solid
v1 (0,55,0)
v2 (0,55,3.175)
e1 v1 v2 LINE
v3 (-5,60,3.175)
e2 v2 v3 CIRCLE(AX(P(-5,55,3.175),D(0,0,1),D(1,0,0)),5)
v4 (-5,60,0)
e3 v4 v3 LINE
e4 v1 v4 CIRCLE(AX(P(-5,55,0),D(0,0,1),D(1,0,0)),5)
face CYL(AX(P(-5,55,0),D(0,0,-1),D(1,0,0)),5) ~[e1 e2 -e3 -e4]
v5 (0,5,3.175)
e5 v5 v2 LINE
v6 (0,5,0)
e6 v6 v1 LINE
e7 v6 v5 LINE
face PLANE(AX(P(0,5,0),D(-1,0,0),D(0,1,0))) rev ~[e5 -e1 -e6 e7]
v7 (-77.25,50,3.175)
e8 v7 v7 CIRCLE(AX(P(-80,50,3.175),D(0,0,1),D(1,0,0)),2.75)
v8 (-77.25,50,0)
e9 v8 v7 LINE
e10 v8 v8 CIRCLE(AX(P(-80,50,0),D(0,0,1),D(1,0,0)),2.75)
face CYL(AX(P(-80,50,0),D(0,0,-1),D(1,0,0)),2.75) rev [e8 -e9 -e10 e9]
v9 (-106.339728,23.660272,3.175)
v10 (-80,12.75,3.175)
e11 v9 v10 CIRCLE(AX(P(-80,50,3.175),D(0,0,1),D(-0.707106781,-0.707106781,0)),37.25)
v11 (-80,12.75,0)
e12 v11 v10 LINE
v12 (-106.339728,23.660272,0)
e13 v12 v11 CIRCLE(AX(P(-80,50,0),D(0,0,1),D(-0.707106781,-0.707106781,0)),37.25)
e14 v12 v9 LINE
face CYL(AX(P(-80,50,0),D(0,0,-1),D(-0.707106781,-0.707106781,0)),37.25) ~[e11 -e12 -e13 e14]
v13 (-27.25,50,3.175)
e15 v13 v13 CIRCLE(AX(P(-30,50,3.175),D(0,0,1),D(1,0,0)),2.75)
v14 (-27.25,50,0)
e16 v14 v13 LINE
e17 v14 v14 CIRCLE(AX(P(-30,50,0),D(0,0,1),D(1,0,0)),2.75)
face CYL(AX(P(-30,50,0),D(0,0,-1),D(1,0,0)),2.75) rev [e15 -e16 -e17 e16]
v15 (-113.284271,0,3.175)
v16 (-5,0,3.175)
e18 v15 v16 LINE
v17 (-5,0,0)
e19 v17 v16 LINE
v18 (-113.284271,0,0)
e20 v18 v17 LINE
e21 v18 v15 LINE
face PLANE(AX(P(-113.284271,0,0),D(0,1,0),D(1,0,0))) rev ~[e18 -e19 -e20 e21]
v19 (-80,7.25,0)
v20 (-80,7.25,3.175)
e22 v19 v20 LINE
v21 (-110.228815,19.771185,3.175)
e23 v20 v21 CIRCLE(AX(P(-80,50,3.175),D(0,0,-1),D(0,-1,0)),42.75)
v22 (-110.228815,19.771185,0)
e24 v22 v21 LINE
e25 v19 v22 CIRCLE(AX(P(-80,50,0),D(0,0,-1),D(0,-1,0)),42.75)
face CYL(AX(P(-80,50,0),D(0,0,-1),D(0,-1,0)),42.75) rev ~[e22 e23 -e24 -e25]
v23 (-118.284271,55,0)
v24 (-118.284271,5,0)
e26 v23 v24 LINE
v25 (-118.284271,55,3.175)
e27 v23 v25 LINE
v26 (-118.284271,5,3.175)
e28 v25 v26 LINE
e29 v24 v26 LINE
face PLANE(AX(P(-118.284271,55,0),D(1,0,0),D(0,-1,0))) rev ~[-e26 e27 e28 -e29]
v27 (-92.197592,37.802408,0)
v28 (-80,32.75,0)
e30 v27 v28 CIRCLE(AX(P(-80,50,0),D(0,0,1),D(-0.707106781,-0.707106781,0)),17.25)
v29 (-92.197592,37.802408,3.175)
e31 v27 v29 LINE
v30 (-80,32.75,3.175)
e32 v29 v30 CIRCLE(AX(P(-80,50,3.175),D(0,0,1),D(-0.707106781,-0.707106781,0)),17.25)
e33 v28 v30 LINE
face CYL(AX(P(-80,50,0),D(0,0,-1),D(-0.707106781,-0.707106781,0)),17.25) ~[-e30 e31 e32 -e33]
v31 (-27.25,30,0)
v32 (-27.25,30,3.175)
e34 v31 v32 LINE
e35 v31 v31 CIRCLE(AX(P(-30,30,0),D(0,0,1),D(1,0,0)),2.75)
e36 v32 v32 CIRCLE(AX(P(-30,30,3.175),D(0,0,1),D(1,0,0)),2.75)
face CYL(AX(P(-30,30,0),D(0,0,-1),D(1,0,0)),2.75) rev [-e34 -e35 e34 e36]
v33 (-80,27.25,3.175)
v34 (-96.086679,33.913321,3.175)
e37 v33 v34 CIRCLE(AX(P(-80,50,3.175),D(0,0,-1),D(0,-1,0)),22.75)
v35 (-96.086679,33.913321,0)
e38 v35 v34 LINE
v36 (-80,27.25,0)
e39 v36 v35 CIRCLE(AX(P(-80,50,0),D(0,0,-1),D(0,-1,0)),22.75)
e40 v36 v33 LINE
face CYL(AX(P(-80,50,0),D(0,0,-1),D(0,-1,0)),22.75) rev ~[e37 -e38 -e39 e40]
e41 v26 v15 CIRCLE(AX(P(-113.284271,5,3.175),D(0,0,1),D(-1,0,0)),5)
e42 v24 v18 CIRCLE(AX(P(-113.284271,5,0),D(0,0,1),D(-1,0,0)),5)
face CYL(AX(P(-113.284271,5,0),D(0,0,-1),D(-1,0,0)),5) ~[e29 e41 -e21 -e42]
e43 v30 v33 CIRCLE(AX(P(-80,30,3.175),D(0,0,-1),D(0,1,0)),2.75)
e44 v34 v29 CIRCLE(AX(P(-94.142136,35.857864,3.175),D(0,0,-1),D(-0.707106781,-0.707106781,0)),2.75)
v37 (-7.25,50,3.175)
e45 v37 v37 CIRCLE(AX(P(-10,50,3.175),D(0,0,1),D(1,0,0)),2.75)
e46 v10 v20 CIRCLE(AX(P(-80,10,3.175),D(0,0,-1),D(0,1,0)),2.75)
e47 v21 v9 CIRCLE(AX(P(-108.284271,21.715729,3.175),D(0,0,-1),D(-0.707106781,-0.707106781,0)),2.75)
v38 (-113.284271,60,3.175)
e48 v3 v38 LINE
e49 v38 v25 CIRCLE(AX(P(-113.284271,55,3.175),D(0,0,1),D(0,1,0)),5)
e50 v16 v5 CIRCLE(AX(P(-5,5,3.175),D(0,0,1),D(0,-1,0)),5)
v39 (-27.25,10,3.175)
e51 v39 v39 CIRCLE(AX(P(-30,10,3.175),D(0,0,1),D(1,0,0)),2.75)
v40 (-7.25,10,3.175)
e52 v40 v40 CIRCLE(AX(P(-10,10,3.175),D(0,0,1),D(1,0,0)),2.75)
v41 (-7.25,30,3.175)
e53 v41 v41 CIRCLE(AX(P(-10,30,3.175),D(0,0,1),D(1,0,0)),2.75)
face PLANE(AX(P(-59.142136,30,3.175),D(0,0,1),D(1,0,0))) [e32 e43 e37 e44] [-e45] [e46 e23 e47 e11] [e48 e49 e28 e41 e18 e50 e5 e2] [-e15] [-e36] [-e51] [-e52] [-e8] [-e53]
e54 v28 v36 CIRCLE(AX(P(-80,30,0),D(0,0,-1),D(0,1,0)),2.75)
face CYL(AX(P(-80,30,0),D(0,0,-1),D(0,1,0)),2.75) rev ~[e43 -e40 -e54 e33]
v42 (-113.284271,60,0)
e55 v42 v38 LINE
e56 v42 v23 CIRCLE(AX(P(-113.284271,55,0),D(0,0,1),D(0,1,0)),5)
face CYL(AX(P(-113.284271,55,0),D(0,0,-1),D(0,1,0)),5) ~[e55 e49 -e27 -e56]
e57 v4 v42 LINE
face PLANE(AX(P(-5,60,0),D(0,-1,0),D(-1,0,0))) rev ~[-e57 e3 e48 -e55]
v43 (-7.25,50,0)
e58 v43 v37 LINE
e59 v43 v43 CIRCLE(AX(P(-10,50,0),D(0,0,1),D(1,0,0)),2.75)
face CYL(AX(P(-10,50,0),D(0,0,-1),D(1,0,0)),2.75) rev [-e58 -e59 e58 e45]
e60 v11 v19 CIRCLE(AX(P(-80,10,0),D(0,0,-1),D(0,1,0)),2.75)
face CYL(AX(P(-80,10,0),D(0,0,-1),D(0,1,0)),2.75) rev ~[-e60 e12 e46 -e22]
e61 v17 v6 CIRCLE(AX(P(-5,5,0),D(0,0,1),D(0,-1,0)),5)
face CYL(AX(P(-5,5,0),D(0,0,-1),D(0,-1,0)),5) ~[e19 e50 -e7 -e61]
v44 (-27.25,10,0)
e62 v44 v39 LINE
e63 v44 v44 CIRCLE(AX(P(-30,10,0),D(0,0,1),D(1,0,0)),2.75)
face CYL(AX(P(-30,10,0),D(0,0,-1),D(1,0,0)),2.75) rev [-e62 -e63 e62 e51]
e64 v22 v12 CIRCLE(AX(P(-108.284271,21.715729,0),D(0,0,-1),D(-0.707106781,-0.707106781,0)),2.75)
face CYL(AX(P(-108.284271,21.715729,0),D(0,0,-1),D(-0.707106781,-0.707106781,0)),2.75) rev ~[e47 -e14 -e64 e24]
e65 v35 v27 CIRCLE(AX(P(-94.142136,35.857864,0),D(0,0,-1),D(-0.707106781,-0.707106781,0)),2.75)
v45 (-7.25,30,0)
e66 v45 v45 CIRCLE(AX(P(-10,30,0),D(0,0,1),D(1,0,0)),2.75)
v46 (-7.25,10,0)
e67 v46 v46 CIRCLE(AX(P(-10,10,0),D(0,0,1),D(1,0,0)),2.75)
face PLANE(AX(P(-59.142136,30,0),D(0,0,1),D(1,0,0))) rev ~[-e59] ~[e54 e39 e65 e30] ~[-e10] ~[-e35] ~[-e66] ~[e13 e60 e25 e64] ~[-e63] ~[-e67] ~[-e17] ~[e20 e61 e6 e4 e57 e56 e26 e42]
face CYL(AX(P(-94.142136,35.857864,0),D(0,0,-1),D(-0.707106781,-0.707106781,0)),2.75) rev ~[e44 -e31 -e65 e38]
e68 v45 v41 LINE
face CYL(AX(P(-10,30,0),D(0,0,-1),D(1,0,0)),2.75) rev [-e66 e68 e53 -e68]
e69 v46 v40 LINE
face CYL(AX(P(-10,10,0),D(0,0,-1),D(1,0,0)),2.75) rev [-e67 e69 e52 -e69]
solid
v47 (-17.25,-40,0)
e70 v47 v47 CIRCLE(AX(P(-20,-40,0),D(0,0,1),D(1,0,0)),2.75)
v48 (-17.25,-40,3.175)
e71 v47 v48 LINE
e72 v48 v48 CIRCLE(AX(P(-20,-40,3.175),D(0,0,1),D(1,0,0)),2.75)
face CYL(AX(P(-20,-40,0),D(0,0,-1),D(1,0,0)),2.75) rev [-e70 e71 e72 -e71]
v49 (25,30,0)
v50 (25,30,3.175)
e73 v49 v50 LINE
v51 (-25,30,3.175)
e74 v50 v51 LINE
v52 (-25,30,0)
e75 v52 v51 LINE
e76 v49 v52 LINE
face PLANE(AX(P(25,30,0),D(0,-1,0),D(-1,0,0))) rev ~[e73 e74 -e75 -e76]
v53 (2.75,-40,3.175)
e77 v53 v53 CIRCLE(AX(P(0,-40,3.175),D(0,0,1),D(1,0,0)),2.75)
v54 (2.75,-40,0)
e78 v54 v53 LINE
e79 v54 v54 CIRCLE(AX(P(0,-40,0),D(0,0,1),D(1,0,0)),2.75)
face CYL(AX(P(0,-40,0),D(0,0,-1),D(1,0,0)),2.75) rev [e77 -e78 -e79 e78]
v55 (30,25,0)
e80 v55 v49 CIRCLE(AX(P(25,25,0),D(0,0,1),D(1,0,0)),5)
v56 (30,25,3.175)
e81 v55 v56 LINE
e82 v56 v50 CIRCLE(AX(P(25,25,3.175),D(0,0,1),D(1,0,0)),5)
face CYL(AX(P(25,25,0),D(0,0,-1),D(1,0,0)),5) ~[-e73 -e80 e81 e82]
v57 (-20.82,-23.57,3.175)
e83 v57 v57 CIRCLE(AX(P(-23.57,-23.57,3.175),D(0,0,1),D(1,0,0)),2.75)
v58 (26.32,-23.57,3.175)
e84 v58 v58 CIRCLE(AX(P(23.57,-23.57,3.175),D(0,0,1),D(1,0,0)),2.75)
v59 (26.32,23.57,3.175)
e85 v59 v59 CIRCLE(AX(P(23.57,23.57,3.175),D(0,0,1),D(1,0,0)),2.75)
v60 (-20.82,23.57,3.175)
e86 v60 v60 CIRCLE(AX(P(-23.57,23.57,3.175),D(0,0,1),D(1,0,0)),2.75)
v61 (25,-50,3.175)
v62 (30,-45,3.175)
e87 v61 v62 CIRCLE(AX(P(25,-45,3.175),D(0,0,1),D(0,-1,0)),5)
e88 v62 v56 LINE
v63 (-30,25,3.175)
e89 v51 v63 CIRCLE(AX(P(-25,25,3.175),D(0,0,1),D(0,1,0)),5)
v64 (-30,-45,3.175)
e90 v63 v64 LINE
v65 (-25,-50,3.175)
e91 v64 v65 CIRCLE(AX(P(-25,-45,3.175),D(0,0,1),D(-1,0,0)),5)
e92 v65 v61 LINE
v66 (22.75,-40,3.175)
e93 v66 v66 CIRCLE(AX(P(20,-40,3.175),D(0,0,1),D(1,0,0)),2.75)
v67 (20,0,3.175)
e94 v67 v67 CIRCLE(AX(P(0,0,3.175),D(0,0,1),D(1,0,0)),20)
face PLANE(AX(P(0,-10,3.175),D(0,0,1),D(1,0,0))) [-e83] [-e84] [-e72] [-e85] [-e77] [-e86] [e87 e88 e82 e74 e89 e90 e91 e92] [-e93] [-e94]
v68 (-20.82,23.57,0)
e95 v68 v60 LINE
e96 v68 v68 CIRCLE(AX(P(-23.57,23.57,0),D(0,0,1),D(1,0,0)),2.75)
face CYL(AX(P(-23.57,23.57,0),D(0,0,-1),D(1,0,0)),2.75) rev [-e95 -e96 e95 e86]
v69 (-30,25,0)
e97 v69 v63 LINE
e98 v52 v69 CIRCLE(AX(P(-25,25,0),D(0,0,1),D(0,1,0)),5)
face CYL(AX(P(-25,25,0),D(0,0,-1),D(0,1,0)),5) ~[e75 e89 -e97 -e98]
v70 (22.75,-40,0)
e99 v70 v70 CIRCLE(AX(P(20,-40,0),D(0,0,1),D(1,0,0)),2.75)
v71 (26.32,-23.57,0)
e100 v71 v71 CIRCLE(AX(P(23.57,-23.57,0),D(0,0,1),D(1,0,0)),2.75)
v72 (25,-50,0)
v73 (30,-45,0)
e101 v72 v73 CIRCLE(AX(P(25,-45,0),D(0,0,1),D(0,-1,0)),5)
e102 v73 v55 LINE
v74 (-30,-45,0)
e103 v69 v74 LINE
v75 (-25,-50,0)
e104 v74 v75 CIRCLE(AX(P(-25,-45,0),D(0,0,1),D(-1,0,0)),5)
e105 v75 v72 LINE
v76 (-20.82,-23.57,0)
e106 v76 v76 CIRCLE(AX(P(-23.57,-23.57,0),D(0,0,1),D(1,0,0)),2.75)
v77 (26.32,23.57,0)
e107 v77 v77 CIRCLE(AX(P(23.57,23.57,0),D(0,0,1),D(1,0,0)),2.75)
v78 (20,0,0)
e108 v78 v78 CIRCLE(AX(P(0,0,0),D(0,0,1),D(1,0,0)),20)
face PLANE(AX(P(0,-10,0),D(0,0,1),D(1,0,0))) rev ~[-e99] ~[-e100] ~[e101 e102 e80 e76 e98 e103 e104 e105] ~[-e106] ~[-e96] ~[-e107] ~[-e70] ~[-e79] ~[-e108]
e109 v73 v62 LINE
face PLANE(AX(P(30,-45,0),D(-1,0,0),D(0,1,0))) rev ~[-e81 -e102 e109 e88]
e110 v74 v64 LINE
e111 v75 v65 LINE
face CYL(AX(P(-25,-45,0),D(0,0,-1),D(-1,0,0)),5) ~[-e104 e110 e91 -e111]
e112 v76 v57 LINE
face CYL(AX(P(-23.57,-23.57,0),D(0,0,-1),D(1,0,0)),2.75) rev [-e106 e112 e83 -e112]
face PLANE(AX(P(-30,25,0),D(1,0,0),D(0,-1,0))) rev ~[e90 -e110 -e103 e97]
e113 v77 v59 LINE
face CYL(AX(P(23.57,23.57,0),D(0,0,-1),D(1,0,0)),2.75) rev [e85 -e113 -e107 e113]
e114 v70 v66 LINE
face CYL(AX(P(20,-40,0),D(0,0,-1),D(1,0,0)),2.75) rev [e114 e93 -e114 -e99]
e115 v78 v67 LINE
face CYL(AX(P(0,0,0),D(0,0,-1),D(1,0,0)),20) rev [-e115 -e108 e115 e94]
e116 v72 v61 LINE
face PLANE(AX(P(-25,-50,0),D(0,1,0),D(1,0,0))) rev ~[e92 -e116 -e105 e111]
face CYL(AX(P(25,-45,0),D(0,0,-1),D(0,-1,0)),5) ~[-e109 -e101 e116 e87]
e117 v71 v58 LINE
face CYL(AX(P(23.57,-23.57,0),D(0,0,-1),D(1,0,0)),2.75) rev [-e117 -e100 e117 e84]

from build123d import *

# Parameters (mm, degrees)
F0_R     = 2.75
F0_R_2   = 20
F1_DEPTH = 3.175
F2_R     = 2.75
F3_DEPTH = 3.175


# Not quite as in the source:
# - a length typed as a fraction of an inch, garbled in the dataset ("3 / 203.2 mm" for 3/8 in), is restored


with BuildPart() as f1:
    # F0 (on Top) → F1 (new body)
    with BuildSketch(Plane.XY):
        with BuildLine():
            Line((30, -45), (30, -30))
            Line((30, -30), (30, 25))
            ThreePointArc((30, 25), (28.5355339059, 28.5355339059), (25, 30))
            Line((25, 30), (-25, 30))
            ThreePointArc((-25, 30), (-28.5355339059, 28.5355339059), (-30, 25))
            Line((-30, 25), (-30, -30))
            Line((-30, -30), (-30, -45))
            ThreePointArc((-30, -45), (-28.5355339059, -48.5355339059), (-25, -50))
            Line((-25, -50), (25, -50))
            ThreePointArc((25, -50), (28.5355339059, -48.5355339059), (30, -45))
        make_face()
        with Locations((-20, -40)):
            Circle(F0_R, mode=Mode.SUBTRACT)
        with Locations((0, -40)):
            Circle(F0_R, mode=Mode.SUBTRACT)
        with Locations((-23.57, -23.57)):
            Circle(F0_R, mode=Mode.SUBTRACT)
        with Locations((20, -40)):
            Circle(F0_R, mode=Mode.SUBTRACT)
        with Locations((23.57, -23.57)):
            Circle(F0_R, mode=Mode.SUBTRACT)
        Circle(F0_R_2, mode=Mode.SUBTRACT)
        with Locations((-23.57, 23.57)):
            Circle(F0_R, mode=Mode.SUBTRACT)
        with Locations((23.57, 23.57)):
            Circle(F0_R, mode=Mode.SUBTRACT)
    extrude(amount=F1_DEPTH)


with BuildPart() as f3:
    # F2 (on Top) → F3 (new body)
    with BuildSketch(Plane.XY):
        with BuildLine():
            Line((-113.2842712475, 0), (-5, 0))
            ThreePointArc((-5, 0), (-1.4644660941, 1.4644660941), (0, 5))
            Line((0, 5), (0, 55))
            ThreePointArc((0, 55), (-1.4644660941, 58.5355339059), (-5, 60))
            Line((-5, 60), (-113.2842712475, 60))
            ThreePointArc((-113.2842712475, 60), (-116.8198051534, 58.5355339059), (-118.2842712475, 55))
            Line((-118.2842712475, 55), (-118.2842712475, 5))
            ThreePointArc((-118.2842712475, 5), (-116.8198051534, 1.4644660941), (-113.2842712475, 0))
        make_face()
        with BuildLine():
            ThreePointArc((-110.2288148957, 19.7711851043), (-110.2288148957, 23.6602724008), (-106.3397275992, 23.6602724008))
            ThreePointArc((-106.3397275992, 23.6602724008), (-94.2549578556, 15.585487414), (-80, 12.75))
            ThreePointArc((-80, 12.75), (-77.25, 10), (-80, 7.25))
            ThreePointArc((-80, 7.25), (-96.3597167336, 10.5041499851), (-110.2288148957, 19.7711851043))
        make_face(mode=Mode.SUBTRACT)
        with Locations((-30, 10)):
            Circle(F2_R, mode=Mode.SUBTRACT)
        with Locations((-10, 10)):
            Circle(F2_R, mode=Mode.SUBTRACT)
        with BuildLine():
            ThreePointArc((-96.086679272, 33.913320728), (-96.086679272, 37.8024080245), (-92.1975919755, 37.8024080245))
            ThreePointArc((-92.1975919755, 37.8024080245), (-86.6012892083, 34.0630780642), (-80, 32.75))
            ThreePointArc((-80, 32.75), (-77.25, 30), (-80, 27.25))
            ThreePointArc((-80, 27.25), (-88.7060480863, 28.9817406354), (-96.086679272, 33.913320728))
        make_face(mode=Mode.SUBTRACT)
        with Locations((-80, 50)):
            Circle(F2_R, mode=Mode.SUBTRACT)
        with Locations((-30, 30)):
            Circle(F2_R, mode=Mode.SUBTRACT)
        with Locations((-10, 30)):
            Circle(F2_R, mode=Mode.SUBTRACT)
        with Locations((-30, 50)):
            Circle(F2_R, mode=Mode.SUBTRACT)
        with Locations((-10, 50)):
            Circle(F2_R, mode=Mode.SUBTRACT)
    extrude(amount=F3_DEPTH)


solid = Compound([f1.part, f3.part])
